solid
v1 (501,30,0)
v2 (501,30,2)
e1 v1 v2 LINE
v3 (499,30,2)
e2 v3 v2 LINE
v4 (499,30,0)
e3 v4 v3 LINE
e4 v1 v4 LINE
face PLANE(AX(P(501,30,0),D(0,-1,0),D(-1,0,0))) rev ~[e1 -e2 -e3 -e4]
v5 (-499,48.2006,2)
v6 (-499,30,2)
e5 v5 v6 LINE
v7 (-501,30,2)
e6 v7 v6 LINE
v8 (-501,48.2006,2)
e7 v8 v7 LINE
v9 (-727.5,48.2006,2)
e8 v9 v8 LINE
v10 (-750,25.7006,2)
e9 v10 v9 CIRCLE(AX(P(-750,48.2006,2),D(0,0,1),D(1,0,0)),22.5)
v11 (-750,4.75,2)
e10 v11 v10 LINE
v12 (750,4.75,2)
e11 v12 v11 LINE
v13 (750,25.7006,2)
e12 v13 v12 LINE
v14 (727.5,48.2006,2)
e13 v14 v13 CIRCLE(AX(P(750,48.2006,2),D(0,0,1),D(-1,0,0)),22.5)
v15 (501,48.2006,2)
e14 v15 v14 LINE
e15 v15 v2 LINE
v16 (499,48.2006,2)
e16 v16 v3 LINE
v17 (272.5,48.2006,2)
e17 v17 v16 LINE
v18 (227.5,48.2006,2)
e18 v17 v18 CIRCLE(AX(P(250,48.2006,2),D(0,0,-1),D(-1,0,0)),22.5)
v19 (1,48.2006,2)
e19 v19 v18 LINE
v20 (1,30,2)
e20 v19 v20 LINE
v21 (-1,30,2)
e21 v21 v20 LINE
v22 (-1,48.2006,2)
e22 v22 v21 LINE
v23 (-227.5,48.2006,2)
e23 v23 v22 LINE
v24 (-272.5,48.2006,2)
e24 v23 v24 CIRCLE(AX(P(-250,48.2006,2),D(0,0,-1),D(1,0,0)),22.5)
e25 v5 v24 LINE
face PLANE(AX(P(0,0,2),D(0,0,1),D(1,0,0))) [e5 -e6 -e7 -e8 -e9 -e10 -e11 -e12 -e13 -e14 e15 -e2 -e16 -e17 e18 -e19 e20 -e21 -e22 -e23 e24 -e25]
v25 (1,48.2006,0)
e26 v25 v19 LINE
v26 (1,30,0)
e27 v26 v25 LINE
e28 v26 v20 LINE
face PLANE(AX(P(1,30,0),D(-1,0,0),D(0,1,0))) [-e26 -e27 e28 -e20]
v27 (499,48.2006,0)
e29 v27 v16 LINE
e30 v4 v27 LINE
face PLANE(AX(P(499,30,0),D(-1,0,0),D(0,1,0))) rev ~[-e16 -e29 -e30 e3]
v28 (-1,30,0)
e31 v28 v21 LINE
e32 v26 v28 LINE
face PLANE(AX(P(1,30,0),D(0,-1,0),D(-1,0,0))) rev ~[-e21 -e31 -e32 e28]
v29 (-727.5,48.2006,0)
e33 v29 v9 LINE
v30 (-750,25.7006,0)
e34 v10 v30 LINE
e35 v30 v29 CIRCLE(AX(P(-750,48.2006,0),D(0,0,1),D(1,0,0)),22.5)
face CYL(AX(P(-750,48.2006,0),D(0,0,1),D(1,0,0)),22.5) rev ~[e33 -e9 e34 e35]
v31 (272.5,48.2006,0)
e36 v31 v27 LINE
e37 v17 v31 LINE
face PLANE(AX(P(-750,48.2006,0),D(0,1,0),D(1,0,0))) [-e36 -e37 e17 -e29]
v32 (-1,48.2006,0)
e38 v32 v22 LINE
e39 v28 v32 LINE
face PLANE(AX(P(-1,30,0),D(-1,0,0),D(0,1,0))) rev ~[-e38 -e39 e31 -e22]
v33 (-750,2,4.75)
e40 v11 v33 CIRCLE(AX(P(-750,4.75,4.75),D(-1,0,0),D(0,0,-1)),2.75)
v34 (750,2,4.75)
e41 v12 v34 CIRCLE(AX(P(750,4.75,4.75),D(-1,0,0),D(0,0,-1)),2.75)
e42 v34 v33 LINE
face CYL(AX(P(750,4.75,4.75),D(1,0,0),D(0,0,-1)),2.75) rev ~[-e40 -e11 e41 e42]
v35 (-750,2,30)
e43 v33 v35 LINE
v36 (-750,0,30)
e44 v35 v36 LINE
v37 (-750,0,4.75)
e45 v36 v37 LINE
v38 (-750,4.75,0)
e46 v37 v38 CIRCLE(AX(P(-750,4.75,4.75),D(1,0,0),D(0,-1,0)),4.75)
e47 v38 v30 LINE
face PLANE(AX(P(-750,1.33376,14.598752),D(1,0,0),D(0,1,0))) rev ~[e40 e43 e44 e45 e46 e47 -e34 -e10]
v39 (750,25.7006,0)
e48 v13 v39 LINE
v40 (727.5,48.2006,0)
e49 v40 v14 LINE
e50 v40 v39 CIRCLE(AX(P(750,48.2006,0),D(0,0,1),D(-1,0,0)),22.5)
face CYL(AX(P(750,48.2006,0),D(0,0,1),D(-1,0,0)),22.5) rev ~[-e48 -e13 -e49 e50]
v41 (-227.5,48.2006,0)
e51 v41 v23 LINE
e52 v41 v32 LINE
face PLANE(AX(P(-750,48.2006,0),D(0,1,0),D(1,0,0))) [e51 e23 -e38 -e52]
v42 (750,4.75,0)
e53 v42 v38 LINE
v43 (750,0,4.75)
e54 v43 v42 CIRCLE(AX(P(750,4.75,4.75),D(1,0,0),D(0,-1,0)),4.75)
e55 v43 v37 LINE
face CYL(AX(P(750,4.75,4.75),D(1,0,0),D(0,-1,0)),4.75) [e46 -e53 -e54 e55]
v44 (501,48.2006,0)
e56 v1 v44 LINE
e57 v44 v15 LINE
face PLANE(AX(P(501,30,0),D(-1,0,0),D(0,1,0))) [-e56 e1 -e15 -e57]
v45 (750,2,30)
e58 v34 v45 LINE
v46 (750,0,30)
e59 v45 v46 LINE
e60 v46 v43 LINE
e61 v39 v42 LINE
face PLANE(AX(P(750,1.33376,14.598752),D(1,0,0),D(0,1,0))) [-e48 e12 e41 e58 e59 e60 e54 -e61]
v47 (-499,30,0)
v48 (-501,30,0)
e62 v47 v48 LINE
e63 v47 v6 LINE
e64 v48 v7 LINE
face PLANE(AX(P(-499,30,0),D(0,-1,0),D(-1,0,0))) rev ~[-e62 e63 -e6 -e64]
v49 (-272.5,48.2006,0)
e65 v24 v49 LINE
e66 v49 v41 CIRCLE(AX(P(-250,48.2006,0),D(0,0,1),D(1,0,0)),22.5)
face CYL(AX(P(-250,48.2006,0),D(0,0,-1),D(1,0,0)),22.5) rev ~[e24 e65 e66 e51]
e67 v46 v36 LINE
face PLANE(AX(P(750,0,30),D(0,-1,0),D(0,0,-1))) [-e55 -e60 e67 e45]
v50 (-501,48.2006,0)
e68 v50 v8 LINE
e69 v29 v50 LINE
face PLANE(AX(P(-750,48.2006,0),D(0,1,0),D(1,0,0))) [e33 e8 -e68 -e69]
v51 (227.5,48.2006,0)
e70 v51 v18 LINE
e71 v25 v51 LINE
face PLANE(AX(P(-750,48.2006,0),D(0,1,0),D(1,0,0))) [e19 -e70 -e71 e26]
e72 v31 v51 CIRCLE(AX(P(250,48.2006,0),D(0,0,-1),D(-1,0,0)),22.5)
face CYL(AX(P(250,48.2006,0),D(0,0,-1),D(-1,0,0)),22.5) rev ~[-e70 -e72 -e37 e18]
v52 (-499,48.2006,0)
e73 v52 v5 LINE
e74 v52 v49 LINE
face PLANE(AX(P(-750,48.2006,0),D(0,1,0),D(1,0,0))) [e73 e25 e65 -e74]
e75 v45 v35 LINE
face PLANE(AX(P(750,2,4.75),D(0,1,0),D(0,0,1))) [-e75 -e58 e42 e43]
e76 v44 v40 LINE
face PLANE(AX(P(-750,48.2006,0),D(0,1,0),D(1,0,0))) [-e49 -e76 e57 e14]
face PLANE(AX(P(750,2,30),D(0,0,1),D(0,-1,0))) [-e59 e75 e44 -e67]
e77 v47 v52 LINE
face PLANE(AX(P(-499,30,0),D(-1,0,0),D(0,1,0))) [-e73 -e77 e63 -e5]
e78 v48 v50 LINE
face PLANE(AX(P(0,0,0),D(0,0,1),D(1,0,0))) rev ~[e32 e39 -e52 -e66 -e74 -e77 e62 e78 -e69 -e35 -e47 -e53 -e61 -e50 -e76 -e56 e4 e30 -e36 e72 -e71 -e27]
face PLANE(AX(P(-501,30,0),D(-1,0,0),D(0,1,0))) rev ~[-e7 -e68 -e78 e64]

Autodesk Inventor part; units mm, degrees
ref_plane "YZ Plane" through (0, 0, 0) normal (1, 0, 0) x (0, 1, 0)
ref_plane "XZ Plane" through (0, 0, 0) normal (0, 1, 0) x (-1, 0, 0)
ref_plane "XY Plane" through (0, 0, 0) normal (0, 0, 1) x (1, 0, 0)
sketch "Sketch1" plane through (0, 0, 0) normal (0, 0, 1) x (1, 0, 0)
  line L0 (-750, 48.2006) -> (750, 48.2006)
  line L1 (750, 48.2006) -> (750, 0)
  line L2 (750, 0) -> (-750, 0)
  line L3 (-750, 0) -> (-750, 48.2006)
  point P0 (0, 0)
  point P1 (0, 0)
  dimension "d0" = 1500
  dimension "d1" = 48.2006
extrude "Plate1" add sketch "Sketch1" along normal blind 2
sketch "Sketch2" plane through (750, 2, 0) normal (0, -1, 0) x (1, 0, 0)
  line L0 (-1500, 0) -> (0, 0)
  line L1 (0, 0) -> (0, 30)
  line L2 (0, 30) -> (-1500, 30)
  line L3 (-1500, 30) -> (-1500, 0)
edge flange "Flange1" height 30 angle 90 thickness 2 bend radius 2.75 thickness toward (0, -1, 0) relief round relief width 2 relief depth 1 edges at (0, 0, 2) wall of the first edge with corners at (-750, 2, 0) (750, 2, 0) (750, 2, 30) (-750, 2, 30)
bend "Bend1"
corner "Corner1"
sketch "Sketch5" plane through (0, 0, 0) normal (0, 0, -1) x (-1, 0, 0)
  line L0 (750, 48.2006) -> (-750, 48.2006) projected
  line L1 (-1, 30) -> (-1, 48.2006)
  line L2 (750, 0) -> (-750, 0) projected
  line L3 (-1, 30) -> (1, 30)
  line L4 (1, 30) -> (1, 48.2006)
  point P0 (0, 0)
  point P1 (0, 30)
  point P2 (0, 0)
  dimension "d27" = 2
  dimension "d28" = 30
extrude "Extrusion1" cut sketch "Sketch5" against normal through all
pattern_linear "Rectangular Pattern1" count 3 spacing 500 along (1, 0, 0) of "Extrusion1" first direction both ways yes
sketch "Sketch6" plane through (0, 0, 0) normal (0, 0, -1) x (-1, 0, 0)
  line L0 (-750, 48.2006) -> (-750, 4.75) projected
  circle A0 centre (-750, 48.2006) radius 22.5
  line L1 (-750, 48.2006) -> (750, 48.2006) projected
  line L2 (-1, 48.2006) -> (-1, 30) projected
  line L3 (-499, 48.2006) -> (-499, 30) projected
  line L4 (-1, 30) -> (-499, 30) construction
  circle A1 centre (-250, 48.2006) radius 22.5
  point P0 (0, 0)
  point P1 (-727.5, 48.2006)
  point P2 (-750, 25.7006)
  point P3 (-250, 30)
  dimension "d24" = 45
extrude "Extrusion2" cut sketch "Sketch6" along normal mid plane 30 contours L1 A0 L0 | A1 L1 | L1 A1 picked at (-748.3311, 33.3886)
mirror "Mirror1" about plane through (0, 0, 0) normal (1, 0, 0) of "Extrusion2"
sketch "Sketch7" plane through (0, 0, 2) normal (0, 0, 1) x (1, 0, 0)
  arc A0 (-750, 25.7006) -> (-727.5, 48.2006) centre (-750, 48.2006) ccw projected
  line L0 (-750, 4.75) -> (-750, 25.7006) projected
  line L1 (-750, 4.75) -> (750, 4.75) projected
  line L2 (750, 25.7006) -> (750, 4.75) projected
  arc A1 (727.5, 48.2006) -> (750, 25.7006) centre (750, 48.2006) ccw projected
  line L3 (501, 48.2006) -> (727.5, 48.2006) projected
  line L4 (501, 48.2006) -> (501, 30) projected
  line L5 (501, 30) -> (499, 30) projected
  line L6 (499, 30) -> (499, 48.2006) projected
  line L7 (1, 48.2006) -> (227.5, 48.2006) projected
  line L8 (1, 48.2006) -> (1, 30) projected
  line L9 (1, 30) -> (-1, 30) projected
  line L10 (-1, 30) -> (-1, 48.2006) projected
  line L11 (-499, 48.2006) -> (-272.5, 48.2006) projected
  line L12 (-499, 48.2006) -> (-499, 30) projected
  line L13 (-499, 30) -> (-501, 30) projected
  line L14 (-501, 30) -> (-501, 48.2006) projected
  line L15 (-727.5, 48.2006) -> (-501, 48.2006) projected
  line L16 (650, 4.75) -> (650, 48.2006) construction
  line L17 (-750, 4.75) -> (750, 4.75) projected
  circle A2 centre (650, 26.4753) radius 5
  circle A3 centre (630, 26.4753) radius 5
  line L18 (272.5, 48.2006) -> (499, 48.2006) projected
  arc A4 (227.5, 48.2006) -> (272.5, 48.2006) centre (250, 48.2006) ccw projected
  line L19 (-227.5, 48.2006) -> (-1, 48.2006) projected
  arc A5 (-272.5, 48.2006) -> (-227.5, 48.2006) centre (-250, 48.2006) ccw projected
  point P0 (0, 0)
  dimension "d29" = 100
  dimension "d30" = 10
  dimension "d31" = 10
  dimension "d32" = 20
extrude "Extrusion3" [suppressed]
mirror "Mirror2" [suppressed]
sketch "Sketch8" plane through (0, 0, 2) normal (0, 0, 1) x (1, 0, 0)
  line L0 (494, 43.2006) -> (494, 31.2006) construction
  line L1 (494, 31.2006) -> (294, 31.2006) construction
  line L2 (294, 31.2006) -> (294, 43.2006) construction
  line L3 (294, 43.2006) -> (494, 43.2006) construction
  line L4 (501, 48.2006) -> (727.5, 48.2006) projected
  line L5 (272.5, 48.2006) -> (499, 48.2006) projected
  point P0 (0, 0)
  dimension "d35" = 200
  dimension "d36" = 12
  dimension "d39" = 5
  dimension "d40" = 5
mark "Mark1"
equation "\"d28\" = Стрингер_глубина_паза"
equation "\"d1\" = Стрингер_4"
equation "\"d27\" = d18"
equation "\"d2\" = Thickness"
equation "\"d3\" = BendReliefWidth"
equation "\"d4\" = BendReliefDepth"
equation "\"d5\" = MinimumRemnant"
equation "\"d6\" = TransitionRadius"
equation "\"d9\" = BendRadius"
equation "\"d10\" = CornerReliefSize"
equation "\"d11\" = GapSize"
equation "\"d12\" = JacobiRadiusSize"
equation "\"BendReliefWidth\" = Thickness"
equation "\"BendReliefDepth\" = 0.5 * Thickness"
equation "\"CornerReliefSize\" = 4 * Thickness"
equation "\"MinimumRemnant\" = 2 * Thickness"
equation "\"TransitionRadius\" = BendRadius"
equation "\"JacobiRadiusSize\" = BendRadius"
equation "\"GapSize\" = Thickness"
equation "\"d18\" = Thickness"
equation "\"Стрингер_4\" = 48.200594"
equation "\"Thickness\" = 2"
equation "\"BendRadius\" = 2.75"
equation "\"Стрингер_глубина_паза\" = 30"
properties part number "MSC 064 stringer board ##" material "Stainless Steel"
